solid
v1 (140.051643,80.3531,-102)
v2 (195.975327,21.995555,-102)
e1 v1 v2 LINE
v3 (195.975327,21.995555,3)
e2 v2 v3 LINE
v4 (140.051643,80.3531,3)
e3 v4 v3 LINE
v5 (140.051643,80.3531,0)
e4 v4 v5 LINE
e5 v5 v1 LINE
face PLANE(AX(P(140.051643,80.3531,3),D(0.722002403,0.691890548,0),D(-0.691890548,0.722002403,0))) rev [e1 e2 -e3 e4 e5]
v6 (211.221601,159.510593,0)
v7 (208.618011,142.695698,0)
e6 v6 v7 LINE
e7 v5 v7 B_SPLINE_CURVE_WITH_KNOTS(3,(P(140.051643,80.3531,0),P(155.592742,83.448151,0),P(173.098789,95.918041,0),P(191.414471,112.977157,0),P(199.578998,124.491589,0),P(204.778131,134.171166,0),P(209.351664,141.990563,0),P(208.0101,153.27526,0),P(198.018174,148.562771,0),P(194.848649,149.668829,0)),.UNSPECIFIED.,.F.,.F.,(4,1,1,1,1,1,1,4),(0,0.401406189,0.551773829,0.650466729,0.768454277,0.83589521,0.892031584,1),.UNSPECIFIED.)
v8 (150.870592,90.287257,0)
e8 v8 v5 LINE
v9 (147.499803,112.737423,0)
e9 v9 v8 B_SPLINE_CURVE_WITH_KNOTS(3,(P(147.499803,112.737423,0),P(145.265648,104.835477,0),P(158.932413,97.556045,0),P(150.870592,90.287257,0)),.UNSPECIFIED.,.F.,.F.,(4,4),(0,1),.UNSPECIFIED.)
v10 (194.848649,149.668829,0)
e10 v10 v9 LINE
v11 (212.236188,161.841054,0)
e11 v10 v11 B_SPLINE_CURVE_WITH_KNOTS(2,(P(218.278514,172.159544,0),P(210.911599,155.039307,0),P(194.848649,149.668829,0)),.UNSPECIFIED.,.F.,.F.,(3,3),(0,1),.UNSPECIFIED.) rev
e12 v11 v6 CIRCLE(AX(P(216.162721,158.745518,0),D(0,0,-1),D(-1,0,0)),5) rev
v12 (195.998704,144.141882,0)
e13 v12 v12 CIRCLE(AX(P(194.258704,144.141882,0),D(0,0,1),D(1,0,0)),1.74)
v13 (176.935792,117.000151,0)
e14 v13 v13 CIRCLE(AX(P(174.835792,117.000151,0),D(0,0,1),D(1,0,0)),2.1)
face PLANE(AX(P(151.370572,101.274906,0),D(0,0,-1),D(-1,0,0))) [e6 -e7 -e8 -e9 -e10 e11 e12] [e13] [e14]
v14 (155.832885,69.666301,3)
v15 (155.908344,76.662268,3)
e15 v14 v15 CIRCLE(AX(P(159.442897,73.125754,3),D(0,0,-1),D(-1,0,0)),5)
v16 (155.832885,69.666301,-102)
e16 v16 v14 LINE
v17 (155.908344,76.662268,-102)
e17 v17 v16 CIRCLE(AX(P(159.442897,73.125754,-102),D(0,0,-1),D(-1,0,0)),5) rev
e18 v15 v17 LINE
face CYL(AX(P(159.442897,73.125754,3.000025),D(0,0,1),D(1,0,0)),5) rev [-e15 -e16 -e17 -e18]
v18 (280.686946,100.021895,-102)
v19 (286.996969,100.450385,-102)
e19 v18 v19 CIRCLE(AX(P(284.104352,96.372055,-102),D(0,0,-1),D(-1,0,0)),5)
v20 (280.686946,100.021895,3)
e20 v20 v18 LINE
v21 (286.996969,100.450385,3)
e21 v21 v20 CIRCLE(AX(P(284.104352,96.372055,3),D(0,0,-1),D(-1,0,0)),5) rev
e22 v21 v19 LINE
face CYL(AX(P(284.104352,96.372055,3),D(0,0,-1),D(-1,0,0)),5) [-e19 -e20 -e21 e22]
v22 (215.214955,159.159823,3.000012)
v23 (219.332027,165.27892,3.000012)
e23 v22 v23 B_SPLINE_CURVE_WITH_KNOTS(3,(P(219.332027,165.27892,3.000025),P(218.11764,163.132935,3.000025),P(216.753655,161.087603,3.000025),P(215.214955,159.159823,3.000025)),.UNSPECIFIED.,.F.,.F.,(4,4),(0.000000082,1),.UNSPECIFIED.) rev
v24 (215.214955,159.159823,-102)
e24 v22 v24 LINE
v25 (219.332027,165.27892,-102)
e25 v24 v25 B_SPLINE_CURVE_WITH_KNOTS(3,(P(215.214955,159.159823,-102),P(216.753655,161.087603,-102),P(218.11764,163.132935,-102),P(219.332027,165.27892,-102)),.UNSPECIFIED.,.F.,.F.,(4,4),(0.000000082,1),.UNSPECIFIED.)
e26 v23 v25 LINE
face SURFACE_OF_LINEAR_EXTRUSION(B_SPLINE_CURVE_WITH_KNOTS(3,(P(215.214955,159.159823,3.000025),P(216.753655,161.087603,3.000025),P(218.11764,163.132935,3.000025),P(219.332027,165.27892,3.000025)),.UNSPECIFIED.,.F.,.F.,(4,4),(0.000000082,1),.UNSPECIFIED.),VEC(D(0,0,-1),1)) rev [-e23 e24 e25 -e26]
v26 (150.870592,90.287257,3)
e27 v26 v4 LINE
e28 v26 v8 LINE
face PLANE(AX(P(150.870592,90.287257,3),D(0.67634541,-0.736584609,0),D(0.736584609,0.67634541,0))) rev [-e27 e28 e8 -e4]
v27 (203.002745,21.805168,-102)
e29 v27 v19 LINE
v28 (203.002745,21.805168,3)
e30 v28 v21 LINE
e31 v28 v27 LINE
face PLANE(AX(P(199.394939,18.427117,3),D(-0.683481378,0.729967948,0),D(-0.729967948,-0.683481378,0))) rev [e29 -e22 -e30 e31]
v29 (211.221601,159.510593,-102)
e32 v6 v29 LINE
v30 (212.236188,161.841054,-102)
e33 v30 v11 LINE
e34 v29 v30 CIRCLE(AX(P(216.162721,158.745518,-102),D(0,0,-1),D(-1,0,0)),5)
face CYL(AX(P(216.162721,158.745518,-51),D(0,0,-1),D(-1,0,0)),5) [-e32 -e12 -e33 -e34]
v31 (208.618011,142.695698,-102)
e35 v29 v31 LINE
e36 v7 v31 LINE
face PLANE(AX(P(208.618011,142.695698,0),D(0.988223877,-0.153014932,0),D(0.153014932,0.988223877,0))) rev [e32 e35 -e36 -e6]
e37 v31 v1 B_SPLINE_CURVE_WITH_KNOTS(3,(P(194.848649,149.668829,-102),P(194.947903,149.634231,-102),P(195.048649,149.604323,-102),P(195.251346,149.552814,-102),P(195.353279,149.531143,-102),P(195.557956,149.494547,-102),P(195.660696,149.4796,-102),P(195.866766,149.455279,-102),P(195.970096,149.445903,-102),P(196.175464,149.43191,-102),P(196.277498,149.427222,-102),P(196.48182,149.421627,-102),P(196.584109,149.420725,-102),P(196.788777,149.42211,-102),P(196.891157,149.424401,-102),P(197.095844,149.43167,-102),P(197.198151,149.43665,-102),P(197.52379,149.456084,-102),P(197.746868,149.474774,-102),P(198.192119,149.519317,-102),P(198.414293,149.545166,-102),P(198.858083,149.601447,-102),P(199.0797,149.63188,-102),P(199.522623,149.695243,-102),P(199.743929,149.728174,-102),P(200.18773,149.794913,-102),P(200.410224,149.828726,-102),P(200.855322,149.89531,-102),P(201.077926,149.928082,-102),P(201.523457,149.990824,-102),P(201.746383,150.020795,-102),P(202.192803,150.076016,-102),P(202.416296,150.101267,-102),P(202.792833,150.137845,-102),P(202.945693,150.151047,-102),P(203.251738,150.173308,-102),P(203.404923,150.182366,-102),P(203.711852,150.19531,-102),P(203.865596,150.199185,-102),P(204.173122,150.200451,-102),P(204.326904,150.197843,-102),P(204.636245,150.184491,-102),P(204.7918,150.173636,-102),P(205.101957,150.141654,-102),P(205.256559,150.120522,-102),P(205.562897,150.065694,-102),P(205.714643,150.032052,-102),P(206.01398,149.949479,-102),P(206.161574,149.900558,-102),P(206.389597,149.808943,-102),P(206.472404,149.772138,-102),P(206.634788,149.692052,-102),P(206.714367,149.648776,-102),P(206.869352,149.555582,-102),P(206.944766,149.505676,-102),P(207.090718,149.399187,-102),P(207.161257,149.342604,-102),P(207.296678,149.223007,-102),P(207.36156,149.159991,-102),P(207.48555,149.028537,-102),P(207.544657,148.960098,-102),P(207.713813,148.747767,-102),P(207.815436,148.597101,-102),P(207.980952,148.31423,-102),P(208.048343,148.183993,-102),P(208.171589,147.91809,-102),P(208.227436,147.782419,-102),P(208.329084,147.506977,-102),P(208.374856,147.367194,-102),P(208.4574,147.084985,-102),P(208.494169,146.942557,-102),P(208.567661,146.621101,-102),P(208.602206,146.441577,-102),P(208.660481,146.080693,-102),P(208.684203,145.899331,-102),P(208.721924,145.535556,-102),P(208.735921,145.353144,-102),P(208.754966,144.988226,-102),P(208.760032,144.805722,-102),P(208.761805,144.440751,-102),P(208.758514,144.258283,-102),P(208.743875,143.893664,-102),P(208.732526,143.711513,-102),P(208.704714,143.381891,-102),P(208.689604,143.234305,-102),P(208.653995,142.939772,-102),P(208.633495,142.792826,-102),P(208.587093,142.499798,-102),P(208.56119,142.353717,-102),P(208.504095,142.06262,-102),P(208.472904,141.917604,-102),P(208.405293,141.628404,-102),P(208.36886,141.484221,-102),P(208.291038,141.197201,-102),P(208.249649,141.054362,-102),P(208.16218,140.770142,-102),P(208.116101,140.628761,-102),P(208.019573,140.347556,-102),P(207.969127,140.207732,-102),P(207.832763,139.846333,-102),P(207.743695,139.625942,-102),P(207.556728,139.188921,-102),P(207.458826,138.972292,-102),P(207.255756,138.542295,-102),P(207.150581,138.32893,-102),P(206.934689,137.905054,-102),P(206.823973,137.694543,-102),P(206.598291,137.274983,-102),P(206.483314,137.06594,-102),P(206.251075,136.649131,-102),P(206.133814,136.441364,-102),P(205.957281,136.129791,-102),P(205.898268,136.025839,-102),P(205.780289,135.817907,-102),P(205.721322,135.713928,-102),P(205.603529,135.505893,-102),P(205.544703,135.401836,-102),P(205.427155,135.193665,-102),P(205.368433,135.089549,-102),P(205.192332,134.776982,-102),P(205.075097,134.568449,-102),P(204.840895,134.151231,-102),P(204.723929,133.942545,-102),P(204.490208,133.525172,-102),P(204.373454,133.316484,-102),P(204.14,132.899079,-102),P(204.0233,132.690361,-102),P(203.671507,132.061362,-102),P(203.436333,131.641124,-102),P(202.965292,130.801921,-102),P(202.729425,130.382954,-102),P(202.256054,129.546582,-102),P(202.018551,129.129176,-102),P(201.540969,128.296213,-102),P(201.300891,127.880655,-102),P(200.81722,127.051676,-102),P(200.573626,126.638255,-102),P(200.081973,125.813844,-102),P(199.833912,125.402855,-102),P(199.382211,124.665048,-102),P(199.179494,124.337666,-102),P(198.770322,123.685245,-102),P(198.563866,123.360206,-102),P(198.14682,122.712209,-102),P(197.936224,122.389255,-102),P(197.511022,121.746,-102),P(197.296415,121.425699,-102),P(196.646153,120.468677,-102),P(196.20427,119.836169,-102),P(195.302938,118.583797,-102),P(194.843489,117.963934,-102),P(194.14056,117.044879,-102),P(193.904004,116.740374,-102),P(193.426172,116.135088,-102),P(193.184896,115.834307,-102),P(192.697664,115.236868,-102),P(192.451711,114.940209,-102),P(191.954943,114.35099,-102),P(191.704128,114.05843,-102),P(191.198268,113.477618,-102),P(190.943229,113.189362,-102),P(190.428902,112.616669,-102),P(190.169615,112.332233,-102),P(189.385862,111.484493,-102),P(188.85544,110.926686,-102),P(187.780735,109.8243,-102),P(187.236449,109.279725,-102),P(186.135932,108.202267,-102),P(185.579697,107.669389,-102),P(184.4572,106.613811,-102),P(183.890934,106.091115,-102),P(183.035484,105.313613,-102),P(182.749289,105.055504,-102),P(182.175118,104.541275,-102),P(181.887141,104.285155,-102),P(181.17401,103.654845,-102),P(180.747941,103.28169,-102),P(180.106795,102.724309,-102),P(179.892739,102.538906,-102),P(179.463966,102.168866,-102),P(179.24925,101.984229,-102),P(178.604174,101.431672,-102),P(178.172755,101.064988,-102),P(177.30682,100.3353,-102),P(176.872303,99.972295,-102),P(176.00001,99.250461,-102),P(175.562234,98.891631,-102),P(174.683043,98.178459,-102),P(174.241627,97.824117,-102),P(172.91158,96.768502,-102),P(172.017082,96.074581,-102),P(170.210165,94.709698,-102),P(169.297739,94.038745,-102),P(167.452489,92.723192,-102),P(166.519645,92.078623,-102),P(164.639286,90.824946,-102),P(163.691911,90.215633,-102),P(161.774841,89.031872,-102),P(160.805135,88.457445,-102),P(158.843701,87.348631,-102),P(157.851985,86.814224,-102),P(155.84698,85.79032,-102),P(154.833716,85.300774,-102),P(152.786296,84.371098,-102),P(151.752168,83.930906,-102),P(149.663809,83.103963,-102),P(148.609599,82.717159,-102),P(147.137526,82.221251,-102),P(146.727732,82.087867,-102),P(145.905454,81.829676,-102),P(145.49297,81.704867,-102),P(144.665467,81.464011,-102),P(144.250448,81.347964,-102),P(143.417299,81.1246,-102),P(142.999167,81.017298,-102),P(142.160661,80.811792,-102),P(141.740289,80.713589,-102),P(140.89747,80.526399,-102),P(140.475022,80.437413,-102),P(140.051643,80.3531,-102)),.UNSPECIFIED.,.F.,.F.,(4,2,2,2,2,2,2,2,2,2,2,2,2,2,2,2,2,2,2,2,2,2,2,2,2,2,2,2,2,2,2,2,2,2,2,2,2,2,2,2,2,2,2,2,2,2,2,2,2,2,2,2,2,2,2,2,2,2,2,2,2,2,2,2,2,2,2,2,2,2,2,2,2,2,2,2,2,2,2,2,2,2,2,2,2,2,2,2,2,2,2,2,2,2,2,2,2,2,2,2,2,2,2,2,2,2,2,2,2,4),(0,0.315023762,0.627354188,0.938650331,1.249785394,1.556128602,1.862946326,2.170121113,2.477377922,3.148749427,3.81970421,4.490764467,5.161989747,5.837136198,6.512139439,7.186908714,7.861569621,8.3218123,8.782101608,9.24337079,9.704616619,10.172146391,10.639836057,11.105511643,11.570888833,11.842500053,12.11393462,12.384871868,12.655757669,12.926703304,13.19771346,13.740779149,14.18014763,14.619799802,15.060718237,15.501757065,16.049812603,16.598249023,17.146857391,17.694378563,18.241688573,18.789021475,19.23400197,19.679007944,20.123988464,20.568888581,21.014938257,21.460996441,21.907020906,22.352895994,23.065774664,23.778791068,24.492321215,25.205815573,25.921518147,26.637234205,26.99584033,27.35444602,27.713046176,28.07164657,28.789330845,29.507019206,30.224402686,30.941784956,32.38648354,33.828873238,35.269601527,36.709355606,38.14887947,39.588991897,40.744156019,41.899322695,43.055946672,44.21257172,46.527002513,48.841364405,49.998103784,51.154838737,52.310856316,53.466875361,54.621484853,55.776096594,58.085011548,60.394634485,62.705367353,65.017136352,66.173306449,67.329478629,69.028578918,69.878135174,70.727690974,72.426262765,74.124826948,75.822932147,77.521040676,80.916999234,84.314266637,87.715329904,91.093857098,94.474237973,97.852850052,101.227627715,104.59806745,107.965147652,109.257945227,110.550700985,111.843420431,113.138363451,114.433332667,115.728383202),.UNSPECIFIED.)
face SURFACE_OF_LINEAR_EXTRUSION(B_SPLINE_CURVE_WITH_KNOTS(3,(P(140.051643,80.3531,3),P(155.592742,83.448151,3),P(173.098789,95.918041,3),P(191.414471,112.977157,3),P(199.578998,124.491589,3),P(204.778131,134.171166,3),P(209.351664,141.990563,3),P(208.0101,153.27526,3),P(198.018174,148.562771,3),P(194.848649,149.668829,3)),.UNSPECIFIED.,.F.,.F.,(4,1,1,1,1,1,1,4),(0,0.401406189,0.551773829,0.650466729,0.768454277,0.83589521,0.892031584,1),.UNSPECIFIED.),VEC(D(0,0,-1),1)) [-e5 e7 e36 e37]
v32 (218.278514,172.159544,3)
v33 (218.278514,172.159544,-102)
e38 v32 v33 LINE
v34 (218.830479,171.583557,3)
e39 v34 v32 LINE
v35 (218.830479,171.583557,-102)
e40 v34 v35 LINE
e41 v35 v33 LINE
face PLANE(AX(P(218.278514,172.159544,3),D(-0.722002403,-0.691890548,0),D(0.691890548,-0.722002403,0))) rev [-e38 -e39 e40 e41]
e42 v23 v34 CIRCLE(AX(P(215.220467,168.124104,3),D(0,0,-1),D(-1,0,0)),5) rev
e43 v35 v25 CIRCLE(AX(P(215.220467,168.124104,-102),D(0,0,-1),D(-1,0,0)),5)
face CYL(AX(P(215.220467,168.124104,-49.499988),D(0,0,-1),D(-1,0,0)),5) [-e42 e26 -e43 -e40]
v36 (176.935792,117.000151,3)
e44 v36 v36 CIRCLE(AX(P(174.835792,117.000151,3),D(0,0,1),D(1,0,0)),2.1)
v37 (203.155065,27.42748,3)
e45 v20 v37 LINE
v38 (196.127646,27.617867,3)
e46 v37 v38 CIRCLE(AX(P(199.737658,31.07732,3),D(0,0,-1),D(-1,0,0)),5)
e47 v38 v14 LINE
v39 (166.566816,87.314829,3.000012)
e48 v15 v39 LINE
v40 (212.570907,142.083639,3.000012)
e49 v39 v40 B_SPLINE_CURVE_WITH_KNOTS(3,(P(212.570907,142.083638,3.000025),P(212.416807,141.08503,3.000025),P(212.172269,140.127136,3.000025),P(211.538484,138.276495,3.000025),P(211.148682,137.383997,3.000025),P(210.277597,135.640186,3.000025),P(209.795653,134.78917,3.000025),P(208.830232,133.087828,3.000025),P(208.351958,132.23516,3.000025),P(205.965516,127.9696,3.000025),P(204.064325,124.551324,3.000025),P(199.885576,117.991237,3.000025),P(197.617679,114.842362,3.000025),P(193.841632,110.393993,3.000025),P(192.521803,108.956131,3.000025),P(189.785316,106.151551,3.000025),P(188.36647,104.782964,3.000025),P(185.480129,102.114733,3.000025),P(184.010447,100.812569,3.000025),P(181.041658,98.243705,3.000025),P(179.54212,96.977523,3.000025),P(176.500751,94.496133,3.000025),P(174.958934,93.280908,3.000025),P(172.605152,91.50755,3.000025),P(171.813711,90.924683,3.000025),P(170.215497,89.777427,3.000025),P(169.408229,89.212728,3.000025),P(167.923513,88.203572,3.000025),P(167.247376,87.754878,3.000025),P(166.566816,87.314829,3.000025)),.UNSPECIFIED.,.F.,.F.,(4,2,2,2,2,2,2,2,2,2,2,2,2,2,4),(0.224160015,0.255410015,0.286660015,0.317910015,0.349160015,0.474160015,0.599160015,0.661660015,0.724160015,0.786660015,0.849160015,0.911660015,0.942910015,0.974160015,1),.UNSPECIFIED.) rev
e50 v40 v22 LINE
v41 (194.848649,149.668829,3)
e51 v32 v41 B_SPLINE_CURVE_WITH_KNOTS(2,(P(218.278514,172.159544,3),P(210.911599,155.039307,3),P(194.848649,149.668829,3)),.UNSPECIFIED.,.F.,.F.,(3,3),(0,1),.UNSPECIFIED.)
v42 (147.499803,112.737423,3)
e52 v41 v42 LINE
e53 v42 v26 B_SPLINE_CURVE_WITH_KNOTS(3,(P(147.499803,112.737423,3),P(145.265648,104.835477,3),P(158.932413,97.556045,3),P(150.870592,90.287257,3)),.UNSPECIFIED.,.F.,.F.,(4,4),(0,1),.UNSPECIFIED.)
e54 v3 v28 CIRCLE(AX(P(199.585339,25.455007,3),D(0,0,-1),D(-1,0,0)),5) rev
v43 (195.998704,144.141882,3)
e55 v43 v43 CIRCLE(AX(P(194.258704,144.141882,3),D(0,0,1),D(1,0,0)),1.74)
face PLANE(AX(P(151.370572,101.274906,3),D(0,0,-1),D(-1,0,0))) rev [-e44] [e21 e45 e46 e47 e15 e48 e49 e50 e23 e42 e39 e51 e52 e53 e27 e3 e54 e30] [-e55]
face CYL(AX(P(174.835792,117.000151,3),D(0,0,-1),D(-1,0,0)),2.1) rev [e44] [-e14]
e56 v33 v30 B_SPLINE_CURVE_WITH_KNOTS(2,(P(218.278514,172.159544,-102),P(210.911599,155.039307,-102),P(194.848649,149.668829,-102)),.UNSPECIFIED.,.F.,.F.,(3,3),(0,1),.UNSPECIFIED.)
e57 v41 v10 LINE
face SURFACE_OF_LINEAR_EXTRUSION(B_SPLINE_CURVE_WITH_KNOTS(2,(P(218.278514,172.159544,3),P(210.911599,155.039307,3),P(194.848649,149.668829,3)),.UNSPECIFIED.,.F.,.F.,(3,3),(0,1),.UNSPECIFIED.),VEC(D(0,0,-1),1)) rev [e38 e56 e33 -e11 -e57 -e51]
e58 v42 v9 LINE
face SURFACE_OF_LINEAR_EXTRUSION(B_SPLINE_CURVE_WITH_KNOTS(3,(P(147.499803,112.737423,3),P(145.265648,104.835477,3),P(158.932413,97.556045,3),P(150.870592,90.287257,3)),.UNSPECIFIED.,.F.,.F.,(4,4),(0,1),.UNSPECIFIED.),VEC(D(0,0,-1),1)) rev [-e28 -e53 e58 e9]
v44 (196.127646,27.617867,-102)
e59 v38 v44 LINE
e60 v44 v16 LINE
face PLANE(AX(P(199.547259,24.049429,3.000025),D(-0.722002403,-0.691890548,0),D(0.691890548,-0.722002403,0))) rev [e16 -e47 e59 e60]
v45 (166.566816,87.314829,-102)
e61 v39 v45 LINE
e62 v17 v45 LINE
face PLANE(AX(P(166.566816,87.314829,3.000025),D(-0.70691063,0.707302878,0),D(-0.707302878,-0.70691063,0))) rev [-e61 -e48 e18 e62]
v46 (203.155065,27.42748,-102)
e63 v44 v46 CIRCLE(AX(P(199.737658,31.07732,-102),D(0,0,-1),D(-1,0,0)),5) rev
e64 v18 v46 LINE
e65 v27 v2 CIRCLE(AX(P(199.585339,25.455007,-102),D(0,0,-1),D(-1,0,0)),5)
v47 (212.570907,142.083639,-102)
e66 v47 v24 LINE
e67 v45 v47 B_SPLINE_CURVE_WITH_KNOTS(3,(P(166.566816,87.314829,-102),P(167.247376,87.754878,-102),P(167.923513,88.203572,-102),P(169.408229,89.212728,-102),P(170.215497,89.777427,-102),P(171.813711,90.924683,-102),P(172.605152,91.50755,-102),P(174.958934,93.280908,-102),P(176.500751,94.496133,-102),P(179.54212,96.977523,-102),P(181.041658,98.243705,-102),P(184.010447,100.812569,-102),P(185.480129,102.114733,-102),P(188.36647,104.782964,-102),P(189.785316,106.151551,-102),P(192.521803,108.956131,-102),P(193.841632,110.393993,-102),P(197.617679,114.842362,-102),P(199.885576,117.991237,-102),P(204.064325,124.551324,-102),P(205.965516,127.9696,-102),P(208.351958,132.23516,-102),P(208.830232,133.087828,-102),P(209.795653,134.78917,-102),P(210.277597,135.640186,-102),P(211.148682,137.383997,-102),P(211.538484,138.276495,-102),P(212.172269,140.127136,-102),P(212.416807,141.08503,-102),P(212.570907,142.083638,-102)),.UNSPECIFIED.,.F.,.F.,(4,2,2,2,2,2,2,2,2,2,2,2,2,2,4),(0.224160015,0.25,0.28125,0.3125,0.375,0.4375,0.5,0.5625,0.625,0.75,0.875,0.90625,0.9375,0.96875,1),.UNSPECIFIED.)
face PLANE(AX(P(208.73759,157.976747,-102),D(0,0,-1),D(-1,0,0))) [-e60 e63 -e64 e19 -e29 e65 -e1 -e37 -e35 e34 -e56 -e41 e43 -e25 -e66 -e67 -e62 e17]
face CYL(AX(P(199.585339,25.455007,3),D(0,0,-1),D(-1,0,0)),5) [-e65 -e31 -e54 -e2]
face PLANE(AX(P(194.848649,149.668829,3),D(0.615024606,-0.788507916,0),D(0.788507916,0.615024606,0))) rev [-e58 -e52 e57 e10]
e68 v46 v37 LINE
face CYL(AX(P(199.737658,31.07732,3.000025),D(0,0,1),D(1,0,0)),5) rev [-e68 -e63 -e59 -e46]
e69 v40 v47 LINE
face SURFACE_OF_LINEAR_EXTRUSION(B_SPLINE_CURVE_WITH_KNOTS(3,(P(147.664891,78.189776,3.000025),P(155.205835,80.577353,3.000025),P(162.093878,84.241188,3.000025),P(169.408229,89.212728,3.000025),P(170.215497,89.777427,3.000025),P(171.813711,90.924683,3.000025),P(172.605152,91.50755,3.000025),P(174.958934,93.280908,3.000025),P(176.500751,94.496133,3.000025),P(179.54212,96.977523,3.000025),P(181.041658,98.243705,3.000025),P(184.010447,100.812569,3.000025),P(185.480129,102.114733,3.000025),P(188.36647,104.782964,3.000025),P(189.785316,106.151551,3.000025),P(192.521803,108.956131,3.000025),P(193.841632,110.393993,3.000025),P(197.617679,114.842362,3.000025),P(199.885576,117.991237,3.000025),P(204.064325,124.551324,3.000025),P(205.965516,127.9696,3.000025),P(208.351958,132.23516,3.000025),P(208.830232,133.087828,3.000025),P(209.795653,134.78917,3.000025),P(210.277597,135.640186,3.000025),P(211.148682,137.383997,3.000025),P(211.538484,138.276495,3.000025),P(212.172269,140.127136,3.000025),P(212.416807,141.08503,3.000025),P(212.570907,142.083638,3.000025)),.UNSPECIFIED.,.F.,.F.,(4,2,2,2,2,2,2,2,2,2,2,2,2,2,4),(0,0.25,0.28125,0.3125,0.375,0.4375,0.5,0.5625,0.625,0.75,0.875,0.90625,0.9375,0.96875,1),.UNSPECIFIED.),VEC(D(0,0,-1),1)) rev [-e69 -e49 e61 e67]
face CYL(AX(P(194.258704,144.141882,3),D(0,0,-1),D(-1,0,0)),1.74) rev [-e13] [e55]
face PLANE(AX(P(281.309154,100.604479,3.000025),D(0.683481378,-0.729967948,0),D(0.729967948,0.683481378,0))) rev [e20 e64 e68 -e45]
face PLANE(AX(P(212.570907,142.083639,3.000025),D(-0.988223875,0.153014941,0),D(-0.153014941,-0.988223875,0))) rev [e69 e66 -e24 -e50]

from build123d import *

# Parameters (mm, degrees)
SKETCH8_R                = 2.1
SKETCH8_R_2              = 1.74
BOSS_EXTRUDE5_DEPTH      = 3
BOSS_EXTRUDE6_DEPTH      = 3
BOSS_EXTRUDE6_DEPTH_BACK = 102
CUT_EXTRUDE6_DEPTH       = 102
CUT_EXTRUDE7_DEPTH       = 351.757992155
FILLET4_START            = -103
FILLET4_DEPTH            = 106.0000125
FILLET4_2_DEPTH          = 103
FILLET4_START_2          = -102
FILLET4_3_DEPTH          = 105


with BuildPart() as part:
    # Sketch8 → Boss-Extrude5 (new body)
    with BuildSketch(Plane.XY):
        with BuildLine():
            Line((194.848649274, 149.66882856), (147.499802828, 112.737422991))
            add(Edge.make_bspline(
                [(147.499802828, 112.737422991), (145.265647531, 104.835476757), (158.932413363, 97.556045407), (150.870592183, 90.287256683)],
                knots=[0, 0, 0, 0, 1, 1, 1, 1], degree=3))
            Line((150.870592183, 90.287256683), (140.051642672, 80.353100098))
            add(Edge.make_bspline(
                [(140.051642672, 80.353100098), (155.592742122, 83.448151063), (173.098788956, 95.918040541), (191.414470585, 112.977156665), (199.578997946, 124.491589325), (204.778131359, 134.171165561), (209.351664244, 141.990562819), (208.010100445, 153.27525953), (198.018173528, 148.56277144), (194.848649274, 149.66882856)],
                knots=[0, 0, 0, 0, 0.401406189, 0.551773829, 0.650466729, 0.768454277, 0.83589521, 0.892031584, 1, 1, 1, 1], degree=3))
        make_face()
        with Locations((174.835792074, 117.000151074)):
            Circle(SKETCH8_R, mode=Mode.SUBTRACT)
        with Locations((194.258704, 144.1418815)):
            Circle(SKETCH8_R_2, mode=Mode.SUBTRACT)
    extrude(amount=BOSS_EXTRUDE5_DEPTH)

    # Sketch18 → Boss-Extrude6 (add, two sides: drawn at the far end of the back side and taken through both)
    with BuildSketch(Plane.XY.offset(-BOSS_EXTRUDE6_DEPTH_BACK)):
        with BuildLine():
            Line((140.051642672, 80.353100098), (199.394938769, 18.42711696))
            Line((199.394938769, 18.42711696), (286.996969106, 100.450384619))
            Line((286.996969106, 100.450384619), (218.278514002, 172.159544237))
            add(Edge.make_bspline(
                [(194.848649274, 149.66882856), (210.911598583, 155.039307248), (218.278514002, 172.159544237)],
                knots=[0, 0, 0, 1, 1, 1], degree=2))
            add(Edge.make_bspline(
                [(140.051642672, 80.353100098), (155.592742122, 83.448151063), (173.098788956, 95.918040541), (191.414470585, 112.977156665), (199.578997946, 124.491589325), (204.778131359, 134.171165561), (209.351664244, 141.990562819), (208.010100445, 153.27525953), (198.018173528, 148.56277144), (194.848649274, 149.66882856)],
                knots=[0, 0, 0, 0, 0.401406189, 0.551773829, 0.650466729, 0.768454277, 0.83589521, 0.892031584, 1, 1, 1, 1], degree=3))
        make_face()
    extrude(amount=BOSS_EXTRUDE6_DEPTH + BOSS_EXTRUDE6_DEPTH_BACK)

    # Sketch28 → Cut-Extrude6 (cut)
    with BuildSketch(Plane(origin=(0, 0, -102), x_dir=(-1, 0, 0), z_dir=(0, 0, -1))):
        with BuildLine():
            Line((-208.618011268, 142.695698437), (-211.42914656, 160.85099201))
            add(Edge.make_bspline(
                [(-211.42914656, 160.85099201), (-204.811588501, 152.999832831), (-194.848649266, 149.668828558)],
                knots=[0, 0, 0, 1, 1, 1], degree=2))
            add(Edge.make_bspline(
                [(-194.848649266, 149.668828558), (-198.018173528, 148.56277144), (-208.010100445, 153.27525953), (-208.973304937, 145.173169587), (-208.63144162, 142.782828241), (-208.618011268, 142.695698437)],
                knots=[0, 0, 0, 0, 0.107968416, 0.16410479, 0.166243216, 0.166243216, 0.166243216, 0.166243216], degree=3))
        make_face()
    extrude(amount=-CUT_EXTRUDE6_DEPTH, mode=Mode.SUBTRACT)

    # Sketch29 → Cut-Extrude7 (cut, through all)
    with BuildSketch(Plane(origin=(0, 0, -102), x_dir=(-1, 0, 0), z_dir=(0, 0, -1))):
        with BuildLine():
            Line((-219.332027088, 165.278919845), (-221.693040793, 168.596413398))
            Line((-221.693040793, 168.596413398), (-284.229221249, 103.338587978))
            Line((-284.229221249, 103.338587978), (-281.309153571, 100.604479056))
            Line((-281.309153571, 100.604479056), (-199.54725859, 24.049429241))
            Line((-199.54725859, 24.049429241), (-152.445384828, 73.201229566))
            Line((-152.445384828, 73.201229566), (-166.56681579, 87.314829228))
            add(Edge.make_bspline(
                [(-166.56681579, 87.314829228), (-167.247375692, 87.754878287), (-167.923513322, 88.203571781), (-169.408228588, 89.212727742), (-170.215496626, 89.77742737), (-171.813710515, 90.924683403), (-172.605151804, 91.507550134), (-174.958933573, 93.280907842), (-176.500751491, 94.49613279), (-179.542120366, 96.977523194), (-181.041657541, 98.243705262), (-184.010446881, 100.812569153), (-185.48012911, 102.114732661), (-188.36646995, 104.782964203), (-189.785315925, 106.151551275), (-192.521802781, 108.956131315), (-193.84163234, 110.393993249), (-197.617679355, 114.842362145), (-199.885576111, 117.991237054), (-204.064324609, 124.551324395), (-205.96551608, 127.969600494), (-208.351957694, 132.235160217), (-208.830232235, 133.087828175), (-209.795652517, 134.789170357), (-210.277597021, 135.640186131), (-211.148682062, 137.383997182), (-211.538483698, 138.276494838), (-212.172269158, 140.127136004), (-212.416807154, 141.08503003), (-212.570906768, 142.083638665)],
                knots=[0.224160015, 0.224160015, 0.224160015, 0.224160015, 0.25, 0.25, 0.28125, 0.28125, 0.3125, 0.3125, 0.375, 0.375, 0.4375, 0.4375, 0.5, 0.5, 0.5625, 0.5625, 0.625, 0.625, 0.75, 0.75, 0.875, 0.875, 0.90625, 0.90625, 0.9375, 0.9375, 0.96875, 0.96875, 1, 1, 1, 1], degree=3))
            Line((-212.570906768, 142.083638665), (-215.214954835, 159.159823598))
            add(Edge.make_bspline(
                [(-215.214954835, 159.159823598), (-216.753654874, 161.087602867), (-218.117640246, 163.132934646), (-219.332027088, 165.278919845)],
                knots=[8.2e-08, 8.2e-08, 8.2e-08, 8.2e-08, 1, 1, 1, 1], degree=3))
        make_face()
    extrude(amount=-CUT_EXTRUDE7_DEPTH, mode=Mode.SUBTRACT)

    # Fillet4: read off the stored shape, not the designer's step
    # Fillet4 outline → Fillet4 (cut)
    with BuildSketch(Plane.XY.offset(FILLET4_START)):
        with BuildLine():
            ThreePointArc((280.686945589, 100.021895163), (283.765601821, 101.360567021), (286.996969106, 100.450384619))
            Line((286.996969106, 100.450384619), (284.229221249, 103.338587978))
            Line((284.229221249, 103.338587978), (280.686945589, 100.021895163))
        make_face()
        with BuildLine():
            ThreePointArc((203.002745436, 21.805167569), (199.449928109, 20.456841246), (195.97532653, 21.995554573))
            Line((195.97532653, 21.995554573), (199.394938769, 18.42711696))
            Line((199.394938769, 18.42711696), (203.002745436, 21.805167569))
        make_face()
        with BuildLine():
            Line((221.693040793, 168.596413398), (218.830479101, 171.583556997))
            ThreePointArc((218.830479101, 171.583556997), (220.20472039, 168.520612757), (219.332027088, 165.278919845))
            Line((219.332027088, 165.278919845), (221.693040793, 168.596413398))
        make_face()
    extrude(amount=FILLET4_DEPTH, mode=Mode.SUBTRACT)

    # Fillet4 2 outline → Fillet4 2 (cut)
    with BuildSketch(Plane.XY.offset(FILLET4_START)):
        with BuildLine():
            Line((211.42914656, 160.85099201), (211.221601366, 159.510592657))
            ThreePointArc((211.221601366, 159.510592657), (211.57833699, 160.741370081), (212.236188394, 161.841054082))
            add(Edge.make_bspline(
                [(212.236188394, 161.841054082), (211.839086372, 161.337350073), (211.42914656, 160.85099201)],
                knots=[0.341334138, 0.341334138, 0.341334138, 0.379756542, 0.379756542, 0.379756542], degree=2))
        make_face()
    extrude(amount=FILLET4_2_DEPTH, mode=Mode.SUBTRACT)

    # Fillet4 3 outline → Fillet4 3 (add)
    with BuildSketch(Plane.XY.offset(FILLET4_START_2)):
        with BuildLine():
            Line((152.445384828, 73.201229566), (155.832885267, 69.666301295))
            ThreePointArc((155.832885267, 69.666301295), (154.443188104, 73.179681156), (155.908344132, 76.662268423))
            Line((155.908344132, 76.662268423), (152.445384828, 73.201229566))
        make_face()
        with BuildLine():
            Line((199.54725859, 24.049429241), (203.155065257, 27.427479849))
            ThreePointArc((203.155065257, 27.427479849), (199.60224793, 26.079153527), (196.127646351, 27.617866853))
            Line((196.127646351, 27.617866853), (199.54725859, 24.049429241))
        make_face()
    extrude(amount=FILLET4_3_DEPTH)


solid = part.part
